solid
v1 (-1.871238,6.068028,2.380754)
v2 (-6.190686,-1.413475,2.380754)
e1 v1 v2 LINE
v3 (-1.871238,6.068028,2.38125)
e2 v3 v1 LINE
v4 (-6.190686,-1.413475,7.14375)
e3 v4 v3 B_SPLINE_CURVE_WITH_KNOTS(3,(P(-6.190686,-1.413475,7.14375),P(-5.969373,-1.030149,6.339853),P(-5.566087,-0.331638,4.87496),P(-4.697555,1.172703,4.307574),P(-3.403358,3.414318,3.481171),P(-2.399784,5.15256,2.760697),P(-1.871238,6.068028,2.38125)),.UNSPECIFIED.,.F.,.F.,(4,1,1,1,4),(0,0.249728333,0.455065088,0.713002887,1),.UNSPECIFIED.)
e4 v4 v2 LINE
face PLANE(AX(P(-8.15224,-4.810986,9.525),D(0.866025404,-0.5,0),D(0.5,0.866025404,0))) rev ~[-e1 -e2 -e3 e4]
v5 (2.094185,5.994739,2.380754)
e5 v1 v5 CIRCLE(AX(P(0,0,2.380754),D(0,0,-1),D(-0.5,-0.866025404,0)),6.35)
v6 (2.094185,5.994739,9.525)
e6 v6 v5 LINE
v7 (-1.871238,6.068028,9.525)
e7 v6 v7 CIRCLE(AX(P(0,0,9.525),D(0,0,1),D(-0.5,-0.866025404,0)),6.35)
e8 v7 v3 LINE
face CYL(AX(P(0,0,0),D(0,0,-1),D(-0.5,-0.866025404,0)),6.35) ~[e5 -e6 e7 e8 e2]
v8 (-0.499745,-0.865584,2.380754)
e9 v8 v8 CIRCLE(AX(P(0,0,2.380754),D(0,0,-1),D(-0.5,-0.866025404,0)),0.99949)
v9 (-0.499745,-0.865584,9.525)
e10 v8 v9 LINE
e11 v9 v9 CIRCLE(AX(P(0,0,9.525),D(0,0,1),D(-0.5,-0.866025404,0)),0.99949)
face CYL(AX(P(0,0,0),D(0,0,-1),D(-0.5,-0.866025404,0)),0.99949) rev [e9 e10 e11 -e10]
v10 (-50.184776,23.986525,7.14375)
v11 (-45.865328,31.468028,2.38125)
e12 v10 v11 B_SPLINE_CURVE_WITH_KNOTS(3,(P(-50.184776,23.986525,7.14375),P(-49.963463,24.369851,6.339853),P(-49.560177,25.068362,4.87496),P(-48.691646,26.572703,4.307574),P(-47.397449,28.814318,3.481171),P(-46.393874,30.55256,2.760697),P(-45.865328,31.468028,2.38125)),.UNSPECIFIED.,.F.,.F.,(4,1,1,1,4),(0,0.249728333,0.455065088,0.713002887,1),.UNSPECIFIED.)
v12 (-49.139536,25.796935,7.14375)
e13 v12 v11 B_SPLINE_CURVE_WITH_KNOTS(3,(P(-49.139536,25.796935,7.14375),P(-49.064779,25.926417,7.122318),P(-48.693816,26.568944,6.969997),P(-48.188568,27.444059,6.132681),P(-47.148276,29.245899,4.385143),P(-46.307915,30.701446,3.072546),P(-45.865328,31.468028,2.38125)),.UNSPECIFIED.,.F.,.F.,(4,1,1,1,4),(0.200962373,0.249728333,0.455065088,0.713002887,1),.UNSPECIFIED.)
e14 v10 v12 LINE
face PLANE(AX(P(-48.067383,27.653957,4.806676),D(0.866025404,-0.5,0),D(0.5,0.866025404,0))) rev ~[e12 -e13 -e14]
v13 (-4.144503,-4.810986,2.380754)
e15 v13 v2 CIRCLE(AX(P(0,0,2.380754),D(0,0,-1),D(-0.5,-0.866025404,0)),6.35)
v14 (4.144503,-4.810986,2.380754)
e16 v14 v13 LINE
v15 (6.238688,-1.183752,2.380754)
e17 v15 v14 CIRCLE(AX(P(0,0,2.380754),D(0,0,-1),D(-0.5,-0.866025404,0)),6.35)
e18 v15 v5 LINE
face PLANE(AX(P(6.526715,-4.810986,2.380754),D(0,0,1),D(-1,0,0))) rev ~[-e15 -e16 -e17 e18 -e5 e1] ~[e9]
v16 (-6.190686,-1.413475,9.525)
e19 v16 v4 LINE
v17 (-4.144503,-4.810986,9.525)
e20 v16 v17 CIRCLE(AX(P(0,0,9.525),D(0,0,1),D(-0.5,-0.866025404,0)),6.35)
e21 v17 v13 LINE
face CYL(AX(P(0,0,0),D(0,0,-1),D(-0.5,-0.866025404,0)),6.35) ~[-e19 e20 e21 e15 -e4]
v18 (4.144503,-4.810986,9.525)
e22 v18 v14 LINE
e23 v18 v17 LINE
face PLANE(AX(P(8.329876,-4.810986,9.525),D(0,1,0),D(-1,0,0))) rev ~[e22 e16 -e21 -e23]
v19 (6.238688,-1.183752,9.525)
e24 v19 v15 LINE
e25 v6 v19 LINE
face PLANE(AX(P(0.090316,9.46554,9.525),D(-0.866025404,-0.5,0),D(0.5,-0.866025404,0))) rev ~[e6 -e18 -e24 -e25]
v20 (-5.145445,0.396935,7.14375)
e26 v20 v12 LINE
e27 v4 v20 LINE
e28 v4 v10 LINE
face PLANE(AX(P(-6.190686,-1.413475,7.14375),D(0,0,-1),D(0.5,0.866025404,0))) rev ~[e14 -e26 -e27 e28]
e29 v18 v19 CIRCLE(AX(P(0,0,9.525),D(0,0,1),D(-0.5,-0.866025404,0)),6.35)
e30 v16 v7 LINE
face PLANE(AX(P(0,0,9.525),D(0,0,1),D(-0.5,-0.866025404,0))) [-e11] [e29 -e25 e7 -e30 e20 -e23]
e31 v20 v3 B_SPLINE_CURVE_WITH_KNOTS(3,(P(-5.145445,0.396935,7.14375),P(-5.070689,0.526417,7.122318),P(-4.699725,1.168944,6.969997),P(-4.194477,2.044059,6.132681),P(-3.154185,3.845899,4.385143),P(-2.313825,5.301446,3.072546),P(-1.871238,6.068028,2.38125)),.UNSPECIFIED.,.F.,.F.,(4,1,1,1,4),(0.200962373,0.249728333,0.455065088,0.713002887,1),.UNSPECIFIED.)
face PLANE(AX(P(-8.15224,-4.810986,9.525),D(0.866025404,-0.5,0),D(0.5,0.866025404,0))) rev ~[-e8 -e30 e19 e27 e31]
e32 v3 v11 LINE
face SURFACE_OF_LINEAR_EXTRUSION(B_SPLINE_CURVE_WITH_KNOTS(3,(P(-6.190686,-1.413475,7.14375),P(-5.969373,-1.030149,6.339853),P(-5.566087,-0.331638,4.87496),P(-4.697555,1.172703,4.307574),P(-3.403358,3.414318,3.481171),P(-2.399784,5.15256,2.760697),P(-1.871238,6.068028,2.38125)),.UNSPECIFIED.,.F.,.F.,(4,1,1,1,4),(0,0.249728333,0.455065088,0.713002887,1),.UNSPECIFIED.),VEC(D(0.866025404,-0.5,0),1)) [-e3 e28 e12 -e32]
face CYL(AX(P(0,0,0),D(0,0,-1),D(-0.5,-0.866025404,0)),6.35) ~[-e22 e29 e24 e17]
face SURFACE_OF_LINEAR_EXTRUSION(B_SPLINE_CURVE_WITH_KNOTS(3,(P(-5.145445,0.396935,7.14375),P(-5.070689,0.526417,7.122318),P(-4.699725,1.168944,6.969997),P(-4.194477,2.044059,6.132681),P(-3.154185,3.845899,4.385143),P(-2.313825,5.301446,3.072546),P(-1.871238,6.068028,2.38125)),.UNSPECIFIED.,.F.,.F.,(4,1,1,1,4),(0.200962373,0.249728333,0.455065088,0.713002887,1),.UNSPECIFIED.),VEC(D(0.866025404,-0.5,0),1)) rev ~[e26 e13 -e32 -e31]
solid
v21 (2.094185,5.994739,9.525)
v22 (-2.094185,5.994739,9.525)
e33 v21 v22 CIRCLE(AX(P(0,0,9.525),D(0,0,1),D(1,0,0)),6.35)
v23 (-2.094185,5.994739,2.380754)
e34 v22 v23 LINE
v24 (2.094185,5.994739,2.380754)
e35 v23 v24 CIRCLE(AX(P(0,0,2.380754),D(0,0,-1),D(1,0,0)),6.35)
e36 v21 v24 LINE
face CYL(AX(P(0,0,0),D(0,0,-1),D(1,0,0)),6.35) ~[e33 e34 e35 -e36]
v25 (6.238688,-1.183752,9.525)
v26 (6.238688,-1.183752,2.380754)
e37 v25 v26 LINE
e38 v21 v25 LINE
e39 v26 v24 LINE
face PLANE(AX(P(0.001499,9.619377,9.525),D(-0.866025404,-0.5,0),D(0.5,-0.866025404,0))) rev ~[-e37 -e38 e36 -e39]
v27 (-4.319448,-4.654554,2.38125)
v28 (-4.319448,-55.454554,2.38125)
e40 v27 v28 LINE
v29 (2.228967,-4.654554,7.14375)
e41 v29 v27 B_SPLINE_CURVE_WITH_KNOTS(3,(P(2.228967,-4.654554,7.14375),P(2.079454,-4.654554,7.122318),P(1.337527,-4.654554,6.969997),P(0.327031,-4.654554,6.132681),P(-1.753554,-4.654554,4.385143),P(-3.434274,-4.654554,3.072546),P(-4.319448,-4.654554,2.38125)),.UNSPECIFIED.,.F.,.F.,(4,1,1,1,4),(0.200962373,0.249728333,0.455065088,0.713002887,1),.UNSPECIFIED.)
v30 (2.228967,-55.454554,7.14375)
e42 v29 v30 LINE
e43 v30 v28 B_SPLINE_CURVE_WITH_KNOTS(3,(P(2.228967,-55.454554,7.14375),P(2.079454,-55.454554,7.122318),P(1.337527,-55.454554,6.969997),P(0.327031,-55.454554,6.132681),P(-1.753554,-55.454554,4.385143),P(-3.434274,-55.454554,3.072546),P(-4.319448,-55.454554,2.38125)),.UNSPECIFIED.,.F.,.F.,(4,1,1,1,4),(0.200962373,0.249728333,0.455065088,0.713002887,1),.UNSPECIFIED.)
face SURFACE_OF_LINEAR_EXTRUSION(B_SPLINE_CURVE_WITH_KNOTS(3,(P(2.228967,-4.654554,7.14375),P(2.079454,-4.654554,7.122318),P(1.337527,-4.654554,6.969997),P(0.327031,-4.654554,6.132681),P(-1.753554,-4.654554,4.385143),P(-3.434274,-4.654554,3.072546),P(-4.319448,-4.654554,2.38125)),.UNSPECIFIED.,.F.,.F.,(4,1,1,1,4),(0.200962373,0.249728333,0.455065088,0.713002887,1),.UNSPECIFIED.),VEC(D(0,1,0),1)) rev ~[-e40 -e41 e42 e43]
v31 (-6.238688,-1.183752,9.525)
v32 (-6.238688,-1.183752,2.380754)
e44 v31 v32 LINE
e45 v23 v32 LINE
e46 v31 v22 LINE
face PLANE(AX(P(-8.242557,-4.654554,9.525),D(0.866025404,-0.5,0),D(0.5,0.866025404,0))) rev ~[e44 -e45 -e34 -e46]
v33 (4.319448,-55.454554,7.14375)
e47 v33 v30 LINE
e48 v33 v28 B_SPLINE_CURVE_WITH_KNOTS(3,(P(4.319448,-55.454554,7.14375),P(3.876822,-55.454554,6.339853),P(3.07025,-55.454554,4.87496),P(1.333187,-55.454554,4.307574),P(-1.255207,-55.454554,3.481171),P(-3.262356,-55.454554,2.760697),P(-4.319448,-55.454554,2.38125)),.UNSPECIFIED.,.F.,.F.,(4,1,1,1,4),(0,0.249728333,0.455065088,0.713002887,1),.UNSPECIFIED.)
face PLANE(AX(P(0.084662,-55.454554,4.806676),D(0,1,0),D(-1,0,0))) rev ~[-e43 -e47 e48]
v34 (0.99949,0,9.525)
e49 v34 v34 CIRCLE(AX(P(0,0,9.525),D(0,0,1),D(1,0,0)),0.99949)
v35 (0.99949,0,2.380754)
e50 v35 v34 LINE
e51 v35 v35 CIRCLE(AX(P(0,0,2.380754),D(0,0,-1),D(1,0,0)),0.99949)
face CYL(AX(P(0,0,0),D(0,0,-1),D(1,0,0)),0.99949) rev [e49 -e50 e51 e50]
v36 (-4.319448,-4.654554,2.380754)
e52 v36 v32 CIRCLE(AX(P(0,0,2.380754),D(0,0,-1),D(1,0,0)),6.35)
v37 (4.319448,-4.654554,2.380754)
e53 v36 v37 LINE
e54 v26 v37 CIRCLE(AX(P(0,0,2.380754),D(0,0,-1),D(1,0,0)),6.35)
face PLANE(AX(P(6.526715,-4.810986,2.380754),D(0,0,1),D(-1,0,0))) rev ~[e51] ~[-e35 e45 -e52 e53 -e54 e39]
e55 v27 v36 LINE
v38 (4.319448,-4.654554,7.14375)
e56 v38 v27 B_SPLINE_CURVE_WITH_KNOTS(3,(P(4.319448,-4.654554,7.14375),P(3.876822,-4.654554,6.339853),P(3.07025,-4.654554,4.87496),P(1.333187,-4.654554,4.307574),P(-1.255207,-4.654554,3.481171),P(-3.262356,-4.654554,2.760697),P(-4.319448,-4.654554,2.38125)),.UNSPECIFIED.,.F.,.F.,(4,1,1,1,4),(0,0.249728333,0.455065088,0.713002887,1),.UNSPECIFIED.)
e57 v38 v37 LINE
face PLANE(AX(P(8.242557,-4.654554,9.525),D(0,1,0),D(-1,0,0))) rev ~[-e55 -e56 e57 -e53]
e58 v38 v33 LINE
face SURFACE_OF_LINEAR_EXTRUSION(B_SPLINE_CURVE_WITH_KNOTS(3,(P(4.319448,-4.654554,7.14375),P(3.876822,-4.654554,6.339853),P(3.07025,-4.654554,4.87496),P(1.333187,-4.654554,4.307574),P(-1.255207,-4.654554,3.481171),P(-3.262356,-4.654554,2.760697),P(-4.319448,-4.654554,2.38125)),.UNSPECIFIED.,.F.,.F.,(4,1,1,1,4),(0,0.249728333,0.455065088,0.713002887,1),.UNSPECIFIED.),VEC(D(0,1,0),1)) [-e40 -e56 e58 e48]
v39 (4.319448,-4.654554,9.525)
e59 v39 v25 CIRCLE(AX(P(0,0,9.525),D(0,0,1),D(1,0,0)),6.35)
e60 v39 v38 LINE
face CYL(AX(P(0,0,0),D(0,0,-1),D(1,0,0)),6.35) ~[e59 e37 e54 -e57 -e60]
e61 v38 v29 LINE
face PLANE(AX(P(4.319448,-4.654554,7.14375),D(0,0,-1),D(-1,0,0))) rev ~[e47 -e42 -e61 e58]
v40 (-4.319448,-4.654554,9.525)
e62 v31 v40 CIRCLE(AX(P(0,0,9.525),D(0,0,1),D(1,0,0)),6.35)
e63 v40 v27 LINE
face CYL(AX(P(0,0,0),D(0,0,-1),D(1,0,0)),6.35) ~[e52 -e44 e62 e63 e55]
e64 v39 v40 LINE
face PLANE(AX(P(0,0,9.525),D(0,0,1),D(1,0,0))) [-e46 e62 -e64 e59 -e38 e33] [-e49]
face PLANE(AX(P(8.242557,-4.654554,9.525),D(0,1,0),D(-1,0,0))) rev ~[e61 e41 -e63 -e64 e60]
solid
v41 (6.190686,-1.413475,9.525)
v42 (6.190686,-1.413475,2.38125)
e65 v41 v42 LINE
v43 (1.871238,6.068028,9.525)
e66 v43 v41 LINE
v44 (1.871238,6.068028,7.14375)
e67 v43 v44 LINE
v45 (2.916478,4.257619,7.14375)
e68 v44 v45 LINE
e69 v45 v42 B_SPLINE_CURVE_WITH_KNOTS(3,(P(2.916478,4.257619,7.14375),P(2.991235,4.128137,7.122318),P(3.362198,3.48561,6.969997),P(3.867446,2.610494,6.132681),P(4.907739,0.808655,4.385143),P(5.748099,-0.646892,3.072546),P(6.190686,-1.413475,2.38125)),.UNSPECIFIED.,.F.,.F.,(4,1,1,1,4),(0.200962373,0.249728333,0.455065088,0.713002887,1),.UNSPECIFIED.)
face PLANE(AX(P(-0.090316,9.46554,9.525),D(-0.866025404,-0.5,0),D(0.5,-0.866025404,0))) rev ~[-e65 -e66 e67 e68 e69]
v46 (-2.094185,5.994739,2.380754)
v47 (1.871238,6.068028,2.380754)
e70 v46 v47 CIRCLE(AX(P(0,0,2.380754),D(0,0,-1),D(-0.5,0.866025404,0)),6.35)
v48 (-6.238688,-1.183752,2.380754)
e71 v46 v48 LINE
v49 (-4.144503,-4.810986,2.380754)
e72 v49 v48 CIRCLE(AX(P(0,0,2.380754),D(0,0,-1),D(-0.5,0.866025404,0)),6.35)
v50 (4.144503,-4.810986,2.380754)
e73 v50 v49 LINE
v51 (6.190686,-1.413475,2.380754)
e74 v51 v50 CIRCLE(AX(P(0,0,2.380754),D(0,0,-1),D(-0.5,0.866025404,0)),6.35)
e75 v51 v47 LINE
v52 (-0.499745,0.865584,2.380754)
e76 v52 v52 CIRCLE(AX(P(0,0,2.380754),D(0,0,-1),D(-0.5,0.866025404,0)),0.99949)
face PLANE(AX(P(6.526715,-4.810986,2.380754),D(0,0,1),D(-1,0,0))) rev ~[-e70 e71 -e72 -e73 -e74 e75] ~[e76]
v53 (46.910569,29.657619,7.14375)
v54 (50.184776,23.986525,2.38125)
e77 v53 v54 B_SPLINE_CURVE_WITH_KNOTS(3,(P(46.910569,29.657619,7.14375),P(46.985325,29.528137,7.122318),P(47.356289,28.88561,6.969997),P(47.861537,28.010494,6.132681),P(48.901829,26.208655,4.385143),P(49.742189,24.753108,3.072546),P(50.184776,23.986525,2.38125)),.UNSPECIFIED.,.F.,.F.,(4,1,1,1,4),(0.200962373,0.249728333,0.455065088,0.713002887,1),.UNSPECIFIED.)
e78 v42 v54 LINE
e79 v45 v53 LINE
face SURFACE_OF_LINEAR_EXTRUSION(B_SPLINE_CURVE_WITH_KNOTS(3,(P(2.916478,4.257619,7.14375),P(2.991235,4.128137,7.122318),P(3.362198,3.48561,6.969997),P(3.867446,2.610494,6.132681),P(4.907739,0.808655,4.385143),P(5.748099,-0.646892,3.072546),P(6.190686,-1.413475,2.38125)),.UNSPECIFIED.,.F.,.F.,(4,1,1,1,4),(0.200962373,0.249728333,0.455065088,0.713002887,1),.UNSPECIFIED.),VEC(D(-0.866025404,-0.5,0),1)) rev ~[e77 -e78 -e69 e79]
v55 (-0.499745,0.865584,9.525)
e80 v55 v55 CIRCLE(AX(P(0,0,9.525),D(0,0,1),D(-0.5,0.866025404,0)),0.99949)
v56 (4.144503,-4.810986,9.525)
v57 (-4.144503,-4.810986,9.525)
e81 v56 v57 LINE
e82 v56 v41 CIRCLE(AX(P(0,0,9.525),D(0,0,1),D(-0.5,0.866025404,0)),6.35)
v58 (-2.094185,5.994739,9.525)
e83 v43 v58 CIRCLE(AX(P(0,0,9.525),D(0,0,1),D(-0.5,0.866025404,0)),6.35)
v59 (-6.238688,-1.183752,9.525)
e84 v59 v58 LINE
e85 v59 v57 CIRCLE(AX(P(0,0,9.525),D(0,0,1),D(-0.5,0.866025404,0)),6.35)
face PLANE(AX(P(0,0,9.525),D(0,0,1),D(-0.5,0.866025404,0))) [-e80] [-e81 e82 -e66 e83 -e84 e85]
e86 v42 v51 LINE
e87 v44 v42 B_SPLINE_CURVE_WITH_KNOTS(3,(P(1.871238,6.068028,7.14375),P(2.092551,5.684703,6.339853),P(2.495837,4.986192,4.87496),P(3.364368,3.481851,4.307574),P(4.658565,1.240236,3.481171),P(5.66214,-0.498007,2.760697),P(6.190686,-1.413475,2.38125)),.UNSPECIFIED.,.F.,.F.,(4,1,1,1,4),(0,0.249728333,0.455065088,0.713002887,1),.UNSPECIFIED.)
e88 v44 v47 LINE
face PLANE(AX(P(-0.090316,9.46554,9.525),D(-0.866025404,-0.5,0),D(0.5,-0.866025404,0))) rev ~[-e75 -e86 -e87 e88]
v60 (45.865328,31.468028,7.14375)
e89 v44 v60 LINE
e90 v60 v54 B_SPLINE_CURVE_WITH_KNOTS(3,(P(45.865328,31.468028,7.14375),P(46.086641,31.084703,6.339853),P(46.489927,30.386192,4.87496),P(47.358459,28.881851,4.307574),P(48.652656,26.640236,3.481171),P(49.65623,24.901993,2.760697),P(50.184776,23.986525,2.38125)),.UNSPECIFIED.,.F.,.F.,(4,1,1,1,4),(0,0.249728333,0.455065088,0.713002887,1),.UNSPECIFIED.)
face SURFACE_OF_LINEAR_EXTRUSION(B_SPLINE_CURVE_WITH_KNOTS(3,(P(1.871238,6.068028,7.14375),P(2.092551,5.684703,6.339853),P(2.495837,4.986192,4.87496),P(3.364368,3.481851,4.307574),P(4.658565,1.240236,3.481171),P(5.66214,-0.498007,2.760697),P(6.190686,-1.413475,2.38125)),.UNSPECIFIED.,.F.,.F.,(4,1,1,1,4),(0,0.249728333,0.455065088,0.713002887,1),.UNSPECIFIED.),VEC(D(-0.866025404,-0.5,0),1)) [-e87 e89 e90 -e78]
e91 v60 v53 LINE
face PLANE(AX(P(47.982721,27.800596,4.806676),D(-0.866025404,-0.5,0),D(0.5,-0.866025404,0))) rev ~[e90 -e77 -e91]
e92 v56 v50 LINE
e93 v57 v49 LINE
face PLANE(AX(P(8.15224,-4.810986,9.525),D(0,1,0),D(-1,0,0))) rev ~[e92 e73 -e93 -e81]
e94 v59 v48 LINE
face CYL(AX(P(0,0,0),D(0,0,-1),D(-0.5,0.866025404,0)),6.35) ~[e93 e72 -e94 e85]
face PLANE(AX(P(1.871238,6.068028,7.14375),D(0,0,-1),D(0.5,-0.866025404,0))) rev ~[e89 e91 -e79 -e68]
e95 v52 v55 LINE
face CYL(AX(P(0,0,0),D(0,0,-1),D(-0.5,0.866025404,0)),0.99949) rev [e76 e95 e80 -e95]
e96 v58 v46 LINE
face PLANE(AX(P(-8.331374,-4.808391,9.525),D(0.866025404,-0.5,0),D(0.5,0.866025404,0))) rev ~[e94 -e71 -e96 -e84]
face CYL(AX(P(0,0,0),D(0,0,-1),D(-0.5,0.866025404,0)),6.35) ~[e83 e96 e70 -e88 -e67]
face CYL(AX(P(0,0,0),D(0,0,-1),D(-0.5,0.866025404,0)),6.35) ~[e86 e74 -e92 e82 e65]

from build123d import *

# Parameters (mm, degrees)
F0_R     = 6.35
F0_R_2   = 0.99949
F1_DEPTH = 9.525
F4_DEPTH = 25.4
F6_DEPTH = 50.8
F7_COUNT = 3
F8_W     = 8.2890069642
F8_H     = 2.380754333
F9_DEPTH = 25.4


with BuildPart() as f1:
    # F0 (on Top) → F1 (new body)
    with BuildSketch(Plane.XY):
        Circle(F0_R)
        Circle(F0_R_2, mode=Mode.SUBTRACT)
    extrude(amount=F1_DEPTH)

    # F3 (on offset) → F4 (cut)
    with BuildSketch(Plane.XY.offset(9.525)):
        Polygon((-19.2380820383, -11.0045537162), (19.2410791448, -11.0045537162), (0.0014985533, 22.3193773847), align=None)
        Polygon((0.0014985533, 9.6193773847), (8.2425565167, -4.6545537162), (-8.2395594102, -4.6545537162), (-8.2425565167, -4.6545537162), (0, 9.621972955), align=None, mode=Mode.SUBTRACT)
    extrude(amount=-F4_DEPTH, mode=Mode.SUBTRACT)

    # F5 (on face) → F6 (join)
    with BuildSketch(Plane.XZ.offset(4.6545537162)):
        with BuildLine():
            add(Edge.make_bspline(
                [(4.319447847, 7.14375), (3.8768217141, 6.3398531681), (3.0702504394, 4.8749597867), (1.3331871276, 4.307573582), (-1.2552066512, 3.4811706955), (-3.2623562204, 2.7606969439), (-4.319447847, 2.38125)],
                knots=[0, 0, 0, 0, 0.2497283334, 0.4550650881, 0.7130028867, 1, 1, 1, 1], degree=3))
            Line((4.319447847, 7.14375), (2.2289671052, 7.14375))
            add(Edge.make_bspline(
                [(2.2289671052, 7.14375), (2.0794537401, 7.1223183312), (1.3375273881, 6.9699970017), (0.3270313355, 6.1326811809), (-1.7535535369, 4.3851427196), (-3.4342742537, 3.0725461739), (-4.319447847, 2.38125)],
                knots=[0.2009623726, 0.2009623726, 0.2009623726, 0.2009623726, 0.2497283334, 0.4550650881, 0.7130028867, 1, 1, 1, 1], degree=3))
        make_face()
    extrude(amount=F6_DEPTH)


with BuildPart() as f7_1:
    # F7: instance of F1
    add(f1.part.rotate(Axis((0, 0, 9.525), (0, 0, 1)), 1 * 360 / F7_COUNT))


with BuildPart() as f7_2:
    # F7: instance of F1
    add(f1.part.rotate(Axis((0, 0, 9.525), (0, 0, 1)), 2 * 360 / F7_COUNT))


with BuildPart() as f9_tool:
    # F8 (on face) → F9 (new body)
    with BuildSketch(Plane.XZ.offset(4.8109864775)):
        Polygon((-4.1445034821, 2.380754333), (-6.2417029403, 2.380754333), (-6.2417029403, -0.2239797032), (6.5267146565, -0.2239797032), (6.5267146565, 2.380754333), (4.1445034821, 2.380754333), (4.1445034821, 0), (-4.1445034821, 0), align=None)
        with Locations((0, 1.1903771665)):
            Rectangle(F8_W, F8_H)
    extrude(amount=-F9_DEPTH)


with BuildPart() as f1_1:
    add(f1.part)

    # F9: cut by f9_tool
    add(f9_tool.part, mode=Mode.SUBTRACT)


with BuildPart() as f7_1_1:
    add(f7_1.part)

    # F9: cut by f9_tool
    add(f9_tool.part, mode=Mode.SUBTRACT)


with BuildPart() as f7_2_1:
    add(f7_2.part)

    # F9: cut by f9_tool
    add(f9_tool.part, mode=Mode.SUBTRACT)


solid = Compound([f1_1.part, f7_1_1.part, f7_2_1.part])
